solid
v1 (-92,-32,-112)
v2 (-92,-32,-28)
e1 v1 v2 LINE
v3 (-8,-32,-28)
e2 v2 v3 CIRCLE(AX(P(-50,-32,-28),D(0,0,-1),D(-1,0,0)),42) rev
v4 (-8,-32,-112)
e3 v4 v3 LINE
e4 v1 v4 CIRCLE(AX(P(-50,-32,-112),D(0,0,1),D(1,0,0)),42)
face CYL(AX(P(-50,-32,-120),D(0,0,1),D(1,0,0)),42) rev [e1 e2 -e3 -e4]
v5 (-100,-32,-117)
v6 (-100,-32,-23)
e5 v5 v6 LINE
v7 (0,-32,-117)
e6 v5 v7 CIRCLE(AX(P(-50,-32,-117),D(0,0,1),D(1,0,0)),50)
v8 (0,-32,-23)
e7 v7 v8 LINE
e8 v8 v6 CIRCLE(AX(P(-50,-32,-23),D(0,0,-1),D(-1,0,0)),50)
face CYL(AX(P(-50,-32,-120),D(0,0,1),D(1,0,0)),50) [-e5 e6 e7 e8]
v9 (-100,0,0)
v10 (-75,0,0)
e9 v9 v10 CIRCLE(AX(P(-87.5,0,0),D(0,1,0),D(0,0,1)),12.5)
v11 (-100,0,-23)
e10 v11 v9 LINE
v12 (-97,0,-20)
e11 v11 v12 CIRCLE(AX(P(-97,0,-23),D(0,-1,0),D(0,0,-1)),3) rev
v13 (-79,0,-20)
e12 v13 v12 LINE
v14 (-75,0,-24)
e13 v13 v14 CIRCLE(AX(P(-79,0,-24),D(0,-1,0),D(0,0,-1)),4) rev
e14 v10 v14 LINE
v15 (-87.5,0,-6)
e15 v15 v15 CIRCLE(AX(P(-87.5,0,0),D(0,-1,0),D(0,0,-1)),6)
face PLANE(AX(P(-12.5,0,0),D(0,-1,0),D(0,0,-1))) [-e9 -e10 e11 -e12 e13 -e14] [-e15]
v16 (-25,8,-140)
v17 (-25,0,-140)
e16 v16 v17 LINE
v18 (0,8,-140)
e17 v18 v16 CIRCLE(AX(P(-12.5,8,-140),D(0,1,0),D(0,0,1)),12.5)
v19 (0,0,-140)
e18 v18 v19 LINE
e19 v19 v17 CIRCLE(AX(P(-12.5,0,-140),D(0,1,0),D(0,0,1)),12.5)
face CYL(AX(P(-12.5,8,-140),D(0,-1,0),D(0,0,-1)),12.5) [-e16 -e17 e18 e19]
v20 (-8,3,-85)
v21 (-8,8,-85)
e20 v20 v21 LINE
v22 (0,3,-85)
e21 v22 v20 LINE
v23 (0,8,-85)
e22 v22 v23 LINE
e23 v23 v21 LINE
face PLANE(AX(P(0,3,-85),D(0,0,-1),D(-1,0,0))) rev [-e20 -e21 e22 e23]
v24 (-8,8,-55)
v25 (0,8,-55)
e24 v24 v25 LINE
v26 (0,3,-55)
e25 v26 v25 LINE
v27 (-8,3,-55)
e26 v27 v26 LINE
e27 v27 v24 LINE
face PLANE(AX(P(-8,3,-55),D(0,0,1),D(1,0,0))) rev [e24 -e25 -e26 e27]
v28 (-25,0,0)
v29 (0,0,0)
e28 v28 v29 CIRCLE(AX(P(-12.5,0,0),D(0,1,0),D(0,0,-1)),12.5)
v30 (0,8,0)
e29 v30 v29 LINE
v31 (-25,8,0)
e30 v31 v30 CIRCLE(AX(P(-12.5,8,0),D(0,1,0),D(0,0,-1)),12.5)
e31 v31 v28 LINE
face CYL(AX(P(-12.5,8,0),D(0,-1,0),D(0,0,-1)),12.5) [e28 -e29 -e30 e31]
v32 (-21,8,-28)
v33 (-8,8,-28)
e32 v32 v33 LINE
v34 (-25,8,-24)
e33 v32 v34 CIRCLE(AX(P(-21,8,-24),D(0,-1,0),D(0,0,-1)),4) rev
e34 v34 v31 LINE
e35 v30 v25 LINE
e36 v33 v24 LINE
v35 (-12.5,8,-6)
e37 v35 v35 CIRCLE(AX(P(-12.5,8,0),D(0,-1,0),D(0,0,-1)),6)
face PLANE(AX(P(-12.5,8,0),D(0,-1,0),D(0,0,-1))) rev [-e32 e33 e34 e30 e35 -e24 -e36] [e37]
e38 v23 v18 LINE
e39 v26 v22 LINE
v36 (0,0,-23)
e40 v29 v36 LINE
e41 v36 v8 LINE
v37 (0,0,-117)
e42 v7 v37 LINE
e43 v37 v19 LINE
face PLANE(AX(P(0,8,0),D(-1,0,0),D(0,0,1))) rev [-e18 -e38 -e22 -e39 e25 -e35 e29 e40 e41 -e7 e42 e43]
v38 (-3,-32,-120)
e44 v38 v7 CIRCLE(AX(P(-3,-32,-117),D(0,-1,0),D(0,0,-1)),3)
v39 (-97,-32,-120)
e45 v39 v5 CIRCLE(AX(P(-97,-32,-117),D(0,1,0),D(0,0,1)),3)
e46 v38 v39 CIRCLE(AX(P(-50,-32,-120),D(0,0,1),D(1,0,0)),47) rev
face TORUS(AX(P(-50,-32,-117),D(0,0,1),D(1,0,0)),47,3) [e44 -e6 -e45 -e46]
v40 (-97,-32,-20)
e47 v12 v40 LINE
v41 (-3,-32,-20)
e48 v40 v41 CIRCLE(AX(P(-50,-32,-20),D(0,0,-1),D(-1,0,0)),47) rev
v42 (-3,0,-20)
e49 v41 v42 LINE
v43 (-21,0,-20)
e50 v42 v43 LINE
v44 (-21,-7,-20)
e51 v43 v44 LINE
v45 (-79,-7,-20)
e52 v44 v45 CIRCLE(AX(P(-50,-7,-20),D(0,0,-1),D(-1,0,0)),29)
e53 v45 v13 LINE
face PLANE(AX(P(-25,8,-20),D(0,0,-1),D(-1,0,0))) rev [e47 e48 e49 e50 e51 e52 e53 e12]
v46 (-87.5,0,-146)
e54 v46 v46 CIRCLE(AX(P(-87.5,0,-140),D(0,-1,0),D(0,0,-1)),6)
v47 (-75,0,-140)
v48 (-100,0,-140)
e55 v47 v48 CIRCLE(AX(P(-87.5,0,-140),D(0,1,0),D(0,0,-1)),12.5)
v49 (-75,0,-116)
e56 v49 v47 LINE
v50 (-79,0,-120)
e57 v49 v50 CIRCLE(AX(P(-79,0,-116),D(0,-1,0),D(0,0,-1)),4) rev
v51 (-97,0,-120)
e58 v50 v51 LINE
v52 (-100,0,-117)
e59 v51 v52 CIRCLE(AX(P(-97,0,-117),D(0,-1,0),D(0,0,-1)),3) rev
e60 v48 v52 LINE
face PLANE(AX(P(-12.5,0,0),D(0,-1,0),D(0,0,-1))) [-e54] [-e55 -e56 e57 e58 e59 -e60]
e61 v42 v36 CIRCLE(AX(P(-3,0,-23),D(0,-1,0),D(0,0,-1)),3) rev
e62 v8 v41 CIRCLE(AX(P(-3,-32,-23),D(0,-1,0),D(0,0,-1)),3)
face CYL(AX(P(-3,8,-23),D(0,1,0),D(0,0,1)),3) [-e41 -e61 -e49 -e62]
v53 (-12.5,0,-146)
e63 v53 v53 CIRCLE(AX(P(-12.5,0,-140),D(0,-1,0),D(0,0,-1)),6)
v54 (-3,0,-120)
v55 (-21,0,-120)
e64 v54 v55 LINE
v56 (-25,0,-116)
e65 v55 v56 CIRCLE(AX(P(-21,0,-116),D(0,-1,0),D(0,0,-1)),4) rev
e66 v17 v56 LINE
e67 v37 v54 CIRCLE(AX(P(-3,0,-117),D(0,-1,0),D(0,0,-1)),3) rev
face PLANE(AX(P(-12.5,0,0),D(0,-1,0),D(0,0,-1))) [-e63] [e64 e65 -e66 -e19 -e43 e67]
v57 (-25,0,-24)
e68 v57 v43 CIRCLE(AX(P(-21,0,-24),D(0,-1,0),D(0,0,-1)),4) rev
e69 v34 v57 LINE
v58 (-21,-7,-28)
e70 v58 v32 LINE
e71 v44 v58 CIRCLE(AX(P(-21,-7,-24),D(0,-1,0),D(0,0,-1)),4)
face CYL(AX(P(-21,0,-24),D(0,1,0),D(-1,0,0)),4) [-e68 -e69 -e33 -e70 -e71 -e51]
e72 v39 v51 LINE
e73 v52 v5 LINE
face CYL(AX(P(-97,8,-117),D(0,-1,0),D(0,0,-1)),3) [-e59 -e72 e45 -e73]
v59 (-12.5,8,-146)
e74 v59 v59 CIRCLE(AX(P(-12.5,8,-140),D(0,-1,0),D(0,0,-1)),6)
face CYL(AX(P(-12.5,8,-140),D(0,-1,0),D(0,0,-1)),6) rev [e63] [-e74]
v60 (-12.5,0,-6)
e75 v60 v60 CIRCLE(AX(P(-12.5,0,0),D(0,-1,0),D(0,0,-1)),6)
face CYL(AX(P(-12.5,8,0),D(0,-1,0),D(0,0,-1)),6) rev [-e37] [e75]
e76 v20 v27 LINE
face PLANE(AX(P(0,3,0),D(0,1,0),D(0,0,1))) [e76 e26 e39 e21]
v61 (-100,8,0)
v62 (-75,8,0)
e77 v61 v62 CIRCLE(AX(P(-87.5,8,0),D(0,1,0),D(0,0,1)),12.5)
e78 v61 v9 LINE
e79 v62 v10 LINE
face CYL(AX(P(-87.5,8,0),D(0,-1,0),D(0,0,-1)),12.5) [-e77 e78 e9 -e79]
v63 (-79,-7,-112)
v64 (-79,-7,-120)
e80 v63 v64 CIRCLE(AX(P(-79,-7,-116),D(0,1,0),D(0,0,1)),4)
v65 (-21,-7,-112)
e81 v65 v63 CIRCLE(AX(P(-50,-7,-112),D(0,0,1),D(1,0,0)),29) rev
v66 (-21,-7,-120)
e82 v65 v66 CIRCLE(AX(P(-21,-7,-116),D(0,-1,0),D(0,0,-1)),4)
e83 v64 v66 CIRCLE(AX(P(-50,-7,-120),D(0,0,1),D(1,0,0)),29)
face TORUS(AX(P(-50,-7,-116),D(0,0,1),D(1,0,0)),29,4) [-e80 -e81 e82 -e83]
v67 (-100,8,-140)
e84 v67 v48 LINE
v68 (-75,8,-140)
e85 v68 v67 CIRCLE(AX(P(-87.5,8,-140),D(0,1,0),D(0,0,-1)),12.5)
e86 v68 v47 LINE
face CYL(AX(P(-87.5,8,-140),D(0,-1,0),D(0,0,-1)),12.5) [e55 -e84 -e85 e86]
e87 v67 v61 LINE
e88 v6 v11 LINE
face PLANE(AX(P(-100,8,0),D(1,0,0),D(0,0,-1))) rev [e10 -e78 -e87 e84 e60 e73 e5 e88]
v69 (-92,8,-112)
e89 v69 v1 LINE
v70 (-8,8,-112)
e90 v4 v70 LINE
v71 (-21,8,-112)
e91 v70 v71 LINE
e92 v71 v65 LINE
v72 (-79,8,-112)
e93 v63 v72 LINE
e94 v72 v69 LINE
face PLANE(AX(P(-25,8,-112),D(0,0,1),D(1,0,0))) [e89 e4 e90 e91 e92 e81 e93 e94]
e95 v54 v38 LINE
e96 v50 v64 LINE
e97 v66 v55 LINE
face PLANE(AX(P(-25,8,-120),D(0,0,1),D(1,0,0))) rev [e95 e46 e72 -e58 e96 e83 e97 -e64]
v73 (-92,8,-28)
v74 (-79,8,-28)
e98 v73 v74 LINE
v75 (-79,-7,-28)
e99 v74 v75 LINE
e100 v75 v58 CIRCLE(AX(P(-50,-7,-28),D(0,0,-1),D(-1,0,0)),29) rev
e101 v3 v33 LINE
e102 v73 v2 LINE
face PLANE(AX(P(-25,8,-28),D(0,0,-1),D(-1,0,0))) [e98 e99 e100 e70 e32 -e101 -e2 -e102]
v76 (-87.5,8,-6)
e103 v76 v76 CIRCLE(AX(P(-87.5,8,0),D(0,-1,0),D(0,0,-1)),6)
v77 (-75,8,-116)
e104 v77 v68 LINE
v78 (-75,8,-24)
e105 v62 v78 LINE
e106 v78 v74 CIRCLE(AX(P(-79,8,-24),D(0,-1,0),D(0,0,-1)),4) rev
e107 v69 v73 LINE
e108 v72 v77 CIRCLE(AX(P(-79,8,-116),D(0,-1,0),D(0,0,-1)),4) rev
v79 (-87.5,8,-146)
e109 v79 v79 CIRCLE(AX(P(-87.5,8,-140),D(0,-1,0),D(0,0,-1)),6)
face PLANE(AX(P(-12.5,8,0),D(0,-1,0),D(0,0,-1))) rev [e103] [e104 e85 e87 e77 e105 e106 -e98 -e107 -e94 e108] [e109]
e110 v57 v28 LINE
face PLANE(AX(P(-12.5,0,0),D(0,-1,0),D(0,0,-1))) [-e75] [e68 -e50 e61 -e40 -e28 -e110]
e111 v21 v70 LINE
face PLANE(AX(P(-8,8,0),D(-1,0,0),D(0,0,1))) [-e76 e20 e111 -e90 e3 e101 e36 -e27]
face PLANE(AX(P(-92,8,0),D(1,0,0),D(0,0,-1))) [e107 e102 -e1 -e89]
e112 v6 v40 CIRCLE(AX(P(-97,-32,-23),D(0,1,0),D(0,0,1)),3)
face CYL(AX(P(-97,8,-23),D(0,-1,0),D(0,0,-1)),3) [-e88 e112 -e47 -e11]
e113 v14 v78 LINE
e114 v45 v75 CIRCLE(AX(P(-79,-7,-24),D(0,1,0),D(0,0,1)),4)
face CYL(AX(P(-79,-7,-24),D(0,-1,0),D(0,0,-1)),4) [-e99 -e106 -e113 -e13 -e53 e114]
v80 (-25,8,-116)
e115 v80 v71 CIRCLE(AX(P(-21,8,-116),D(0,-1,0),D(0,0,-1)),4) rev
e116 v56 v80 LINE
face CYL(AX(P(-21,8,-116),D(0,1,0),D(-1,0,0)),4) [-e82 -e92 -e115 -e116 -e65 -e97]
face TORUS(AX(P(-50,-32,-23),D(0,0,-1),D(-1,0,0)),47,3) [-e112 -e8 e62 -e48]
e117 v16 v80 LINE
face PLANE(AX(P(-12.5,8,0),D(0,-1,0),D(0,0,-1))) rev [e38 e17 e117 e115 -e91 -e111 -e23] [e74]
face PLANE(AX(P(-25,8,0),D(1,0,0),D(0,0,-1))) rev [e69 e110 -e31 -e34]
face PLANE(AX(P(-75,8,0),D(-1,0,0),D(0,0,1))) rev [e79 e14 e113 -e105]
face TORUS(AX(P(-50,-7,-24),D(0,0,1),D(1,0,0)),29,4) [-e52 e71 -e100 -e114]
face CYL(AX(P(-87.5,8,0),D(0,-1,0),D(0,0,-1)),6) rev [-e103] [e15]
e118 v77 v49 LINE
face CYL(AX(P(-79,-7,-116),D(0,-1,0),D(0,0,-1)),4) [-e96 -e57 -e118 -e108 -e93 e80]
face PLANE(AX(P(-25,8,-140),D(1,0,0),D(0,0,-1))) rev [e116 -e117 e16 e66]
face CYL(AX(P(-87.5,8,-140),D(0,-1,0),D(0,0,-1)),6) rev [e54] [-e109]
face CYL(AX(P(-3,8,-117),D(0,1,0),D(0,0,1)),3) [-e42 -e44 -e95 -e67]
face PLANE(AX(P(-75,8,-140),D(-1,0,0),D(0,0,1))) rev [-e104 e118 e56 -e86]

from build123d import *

# Parameters (mm, degrees)
BASE_DEPTH              = 8
CROQUIS5_R              = 6
PERFORACIONES_DEPTH     = 8
SALIENTE_EXTRUIR5_DEPTH = 100
VACIADO2_START          = -112
VACIADO2_DEPTH          = 84
CORTAR_EXTRUIR3_DEPTH   = 100
CROQUIS10_W             = 8
CROQUIS10_H             = 30
CORTAR_EXTRUIR4_DEPTH   = 5
REDONDEO1_R             = 4
REDONDEO2_R             = 4
REDONDEO3_R             = 3


# Read off the part's stored shape, not the designer's step: Vaciado2
with BuildPart() as part:
    # Croquis4 → Base (new body)
    with BuildSketch(Plane(origin=(0, 0, 0), x_dir=(1, 0, 0), z_dir=(0, 1, 0))):
        with BuildLine():
            Line((0, 0), (0, 140))
            ThreePointArc((0, 140), (-12.5, 152.5), (-25, 140))
            Line((-25, 140), (-25, 120))
            Line((-25, 120), (-75, 120))
            Line((-75, 120), (-75, 140))
            ThreePointArc((-75, 140), (-87.5, 152.5), (-100, 140))
            Line((-100, 140), (-100, 0))
            ThreePointArc((-100, 0), (-87.5, -12.5), (-75, 0))
            Line((-75, 0), (-75, 20))
            Line((-75, 20), (-25, 20))
            Line((-25, 20), (-25, 0))
            ThreePointArc((-25, 0), (-12.5, -12.5), (0, 0))
        make_face()
    extrude(amount=BASE_DEPTH)

    # Croquis5 → Perforaciones (cut)
    with BuildSketch(Plane.XZ):
        with Locations(Location((-87.5, 0, 0), (0, 0, 270))):
            Circle(CROQUIS5_R)
        with Locations(Location((-12.5, 0, 0), (0, 0, 270))):
            Circle(CROQUIS5_R)
        with Locations(Location((-87.5, -140, 0), (0, 0, 270))):
            Circle(CROQUIS5_R)
        with Locations(Location((-12.5, -140, 0), (0, 0, 270))):
            Circle(CROQUIS5_R)
    extrude(amount=-PERFORACIONES_DEPTH, mode=Mode.SUBTRACT)

    # Croquis7 → Saliente-Extruir5 (add)
    with BuildSketch(Plane.XY.offset(-20)):
        with BuildLine():
            Line((-100, 0), (-100, -32))
            ThreePointArc((-100, -32), (-50, -82), (0, -32))
            Line((0, -32), (0, 0))
            Line((0, 0), (-100, 0))
        make_face()
    extrude(amount=-SALIENTE_EXTRUIR5_DEPTH)

    # Vaciado2 outline → Vaciado2 (cut)
    with BuildSketch(Plane.XY.offset(VACIADO2_START)):
        with BuildLine():
            Line((-8, -32), (-8, 8))
            Line((-8, 8), (-92, 8))
            Line((-92, 8), (-92, -32))
            ThreePointArc((-92, -32), (-50, -74), (-8, -32))
        make_face()
    extrude(amount=VACIADO2_DEPTH, mode=Mode.SUBTRACT)

    # Croquis9 → Cortar-Extruir3 (cut)
    with BuildSketch(Plane.XY.offset(-20)):
        with BuildLine():
            Line((-75, 8), (-75, -7))
            ThreePointArc((-75, -7), (-50, -32), (-25, -7))
            Line((-25, -7), (-25, 8))
            Line((-25, 8), (-75, 8))
        make_face()
    extrude(amount=-CORTAR_EXTRUIR3_DEPTH, mode=Mode.SUBTRACT)

    # Croquis10 → Cortar-Extruir4 (cut)
    with BuildSketch(Plane(origin=(0, 8, 0), x_dir=(1, 0, 0), z_dir=(0, 1, 0))):
        with Locations((-4, 70)):
            Rectangle(CROQUIS10_W, CROQUIS10_H)
    extrude(amount=-CORTAR_EXTRUIR4_DEPTH, mode=Mode.SUBTRACT)

    # Redondeo1
    redondeo1_edges = [part.edges().sort_by_distance(p)[0] for p in [
        (-75, 0.5, -28),
        (-50, -32, -28),
        (-25, 0.5, -28),
        (-75, -3.5, -20),
        (-25, -3.5, -20),
    ]]
    fillet(redondeo1_edges, radius=REDONDEO1_R - 0.0001)  # a hair under: the kernel refuses the full size

    # Redondeo2
    redondeo2_edges = [part.edges().sort_by_distance(p)[0] for p in [
        (-25, 0.5, -112),
        (-25, -3.5, -120),
        (-50, -32, -112),
        (-75, 0.5, -112),
        (-75, -3.5, -120),
    ]]
    fillet(redondeo2_edges, radius=REDONDEO2_R - 0.0001)  # a hair under: the kernel refuses the full size

    # Redondeo3
    redondeo3_edges = [part.edges().sort_by_distance(p)[0] for p in [
        (0, -16, -120),
        (-50, -82, -120),
        (-100, -16, -120),
        (-100, -16, -20),
        (-50, -82, -20),
        (0, -16, -20),
    ]]
    fillet(redondeo3_edges, radius=REDONDEO3_R)


solid = part.part
